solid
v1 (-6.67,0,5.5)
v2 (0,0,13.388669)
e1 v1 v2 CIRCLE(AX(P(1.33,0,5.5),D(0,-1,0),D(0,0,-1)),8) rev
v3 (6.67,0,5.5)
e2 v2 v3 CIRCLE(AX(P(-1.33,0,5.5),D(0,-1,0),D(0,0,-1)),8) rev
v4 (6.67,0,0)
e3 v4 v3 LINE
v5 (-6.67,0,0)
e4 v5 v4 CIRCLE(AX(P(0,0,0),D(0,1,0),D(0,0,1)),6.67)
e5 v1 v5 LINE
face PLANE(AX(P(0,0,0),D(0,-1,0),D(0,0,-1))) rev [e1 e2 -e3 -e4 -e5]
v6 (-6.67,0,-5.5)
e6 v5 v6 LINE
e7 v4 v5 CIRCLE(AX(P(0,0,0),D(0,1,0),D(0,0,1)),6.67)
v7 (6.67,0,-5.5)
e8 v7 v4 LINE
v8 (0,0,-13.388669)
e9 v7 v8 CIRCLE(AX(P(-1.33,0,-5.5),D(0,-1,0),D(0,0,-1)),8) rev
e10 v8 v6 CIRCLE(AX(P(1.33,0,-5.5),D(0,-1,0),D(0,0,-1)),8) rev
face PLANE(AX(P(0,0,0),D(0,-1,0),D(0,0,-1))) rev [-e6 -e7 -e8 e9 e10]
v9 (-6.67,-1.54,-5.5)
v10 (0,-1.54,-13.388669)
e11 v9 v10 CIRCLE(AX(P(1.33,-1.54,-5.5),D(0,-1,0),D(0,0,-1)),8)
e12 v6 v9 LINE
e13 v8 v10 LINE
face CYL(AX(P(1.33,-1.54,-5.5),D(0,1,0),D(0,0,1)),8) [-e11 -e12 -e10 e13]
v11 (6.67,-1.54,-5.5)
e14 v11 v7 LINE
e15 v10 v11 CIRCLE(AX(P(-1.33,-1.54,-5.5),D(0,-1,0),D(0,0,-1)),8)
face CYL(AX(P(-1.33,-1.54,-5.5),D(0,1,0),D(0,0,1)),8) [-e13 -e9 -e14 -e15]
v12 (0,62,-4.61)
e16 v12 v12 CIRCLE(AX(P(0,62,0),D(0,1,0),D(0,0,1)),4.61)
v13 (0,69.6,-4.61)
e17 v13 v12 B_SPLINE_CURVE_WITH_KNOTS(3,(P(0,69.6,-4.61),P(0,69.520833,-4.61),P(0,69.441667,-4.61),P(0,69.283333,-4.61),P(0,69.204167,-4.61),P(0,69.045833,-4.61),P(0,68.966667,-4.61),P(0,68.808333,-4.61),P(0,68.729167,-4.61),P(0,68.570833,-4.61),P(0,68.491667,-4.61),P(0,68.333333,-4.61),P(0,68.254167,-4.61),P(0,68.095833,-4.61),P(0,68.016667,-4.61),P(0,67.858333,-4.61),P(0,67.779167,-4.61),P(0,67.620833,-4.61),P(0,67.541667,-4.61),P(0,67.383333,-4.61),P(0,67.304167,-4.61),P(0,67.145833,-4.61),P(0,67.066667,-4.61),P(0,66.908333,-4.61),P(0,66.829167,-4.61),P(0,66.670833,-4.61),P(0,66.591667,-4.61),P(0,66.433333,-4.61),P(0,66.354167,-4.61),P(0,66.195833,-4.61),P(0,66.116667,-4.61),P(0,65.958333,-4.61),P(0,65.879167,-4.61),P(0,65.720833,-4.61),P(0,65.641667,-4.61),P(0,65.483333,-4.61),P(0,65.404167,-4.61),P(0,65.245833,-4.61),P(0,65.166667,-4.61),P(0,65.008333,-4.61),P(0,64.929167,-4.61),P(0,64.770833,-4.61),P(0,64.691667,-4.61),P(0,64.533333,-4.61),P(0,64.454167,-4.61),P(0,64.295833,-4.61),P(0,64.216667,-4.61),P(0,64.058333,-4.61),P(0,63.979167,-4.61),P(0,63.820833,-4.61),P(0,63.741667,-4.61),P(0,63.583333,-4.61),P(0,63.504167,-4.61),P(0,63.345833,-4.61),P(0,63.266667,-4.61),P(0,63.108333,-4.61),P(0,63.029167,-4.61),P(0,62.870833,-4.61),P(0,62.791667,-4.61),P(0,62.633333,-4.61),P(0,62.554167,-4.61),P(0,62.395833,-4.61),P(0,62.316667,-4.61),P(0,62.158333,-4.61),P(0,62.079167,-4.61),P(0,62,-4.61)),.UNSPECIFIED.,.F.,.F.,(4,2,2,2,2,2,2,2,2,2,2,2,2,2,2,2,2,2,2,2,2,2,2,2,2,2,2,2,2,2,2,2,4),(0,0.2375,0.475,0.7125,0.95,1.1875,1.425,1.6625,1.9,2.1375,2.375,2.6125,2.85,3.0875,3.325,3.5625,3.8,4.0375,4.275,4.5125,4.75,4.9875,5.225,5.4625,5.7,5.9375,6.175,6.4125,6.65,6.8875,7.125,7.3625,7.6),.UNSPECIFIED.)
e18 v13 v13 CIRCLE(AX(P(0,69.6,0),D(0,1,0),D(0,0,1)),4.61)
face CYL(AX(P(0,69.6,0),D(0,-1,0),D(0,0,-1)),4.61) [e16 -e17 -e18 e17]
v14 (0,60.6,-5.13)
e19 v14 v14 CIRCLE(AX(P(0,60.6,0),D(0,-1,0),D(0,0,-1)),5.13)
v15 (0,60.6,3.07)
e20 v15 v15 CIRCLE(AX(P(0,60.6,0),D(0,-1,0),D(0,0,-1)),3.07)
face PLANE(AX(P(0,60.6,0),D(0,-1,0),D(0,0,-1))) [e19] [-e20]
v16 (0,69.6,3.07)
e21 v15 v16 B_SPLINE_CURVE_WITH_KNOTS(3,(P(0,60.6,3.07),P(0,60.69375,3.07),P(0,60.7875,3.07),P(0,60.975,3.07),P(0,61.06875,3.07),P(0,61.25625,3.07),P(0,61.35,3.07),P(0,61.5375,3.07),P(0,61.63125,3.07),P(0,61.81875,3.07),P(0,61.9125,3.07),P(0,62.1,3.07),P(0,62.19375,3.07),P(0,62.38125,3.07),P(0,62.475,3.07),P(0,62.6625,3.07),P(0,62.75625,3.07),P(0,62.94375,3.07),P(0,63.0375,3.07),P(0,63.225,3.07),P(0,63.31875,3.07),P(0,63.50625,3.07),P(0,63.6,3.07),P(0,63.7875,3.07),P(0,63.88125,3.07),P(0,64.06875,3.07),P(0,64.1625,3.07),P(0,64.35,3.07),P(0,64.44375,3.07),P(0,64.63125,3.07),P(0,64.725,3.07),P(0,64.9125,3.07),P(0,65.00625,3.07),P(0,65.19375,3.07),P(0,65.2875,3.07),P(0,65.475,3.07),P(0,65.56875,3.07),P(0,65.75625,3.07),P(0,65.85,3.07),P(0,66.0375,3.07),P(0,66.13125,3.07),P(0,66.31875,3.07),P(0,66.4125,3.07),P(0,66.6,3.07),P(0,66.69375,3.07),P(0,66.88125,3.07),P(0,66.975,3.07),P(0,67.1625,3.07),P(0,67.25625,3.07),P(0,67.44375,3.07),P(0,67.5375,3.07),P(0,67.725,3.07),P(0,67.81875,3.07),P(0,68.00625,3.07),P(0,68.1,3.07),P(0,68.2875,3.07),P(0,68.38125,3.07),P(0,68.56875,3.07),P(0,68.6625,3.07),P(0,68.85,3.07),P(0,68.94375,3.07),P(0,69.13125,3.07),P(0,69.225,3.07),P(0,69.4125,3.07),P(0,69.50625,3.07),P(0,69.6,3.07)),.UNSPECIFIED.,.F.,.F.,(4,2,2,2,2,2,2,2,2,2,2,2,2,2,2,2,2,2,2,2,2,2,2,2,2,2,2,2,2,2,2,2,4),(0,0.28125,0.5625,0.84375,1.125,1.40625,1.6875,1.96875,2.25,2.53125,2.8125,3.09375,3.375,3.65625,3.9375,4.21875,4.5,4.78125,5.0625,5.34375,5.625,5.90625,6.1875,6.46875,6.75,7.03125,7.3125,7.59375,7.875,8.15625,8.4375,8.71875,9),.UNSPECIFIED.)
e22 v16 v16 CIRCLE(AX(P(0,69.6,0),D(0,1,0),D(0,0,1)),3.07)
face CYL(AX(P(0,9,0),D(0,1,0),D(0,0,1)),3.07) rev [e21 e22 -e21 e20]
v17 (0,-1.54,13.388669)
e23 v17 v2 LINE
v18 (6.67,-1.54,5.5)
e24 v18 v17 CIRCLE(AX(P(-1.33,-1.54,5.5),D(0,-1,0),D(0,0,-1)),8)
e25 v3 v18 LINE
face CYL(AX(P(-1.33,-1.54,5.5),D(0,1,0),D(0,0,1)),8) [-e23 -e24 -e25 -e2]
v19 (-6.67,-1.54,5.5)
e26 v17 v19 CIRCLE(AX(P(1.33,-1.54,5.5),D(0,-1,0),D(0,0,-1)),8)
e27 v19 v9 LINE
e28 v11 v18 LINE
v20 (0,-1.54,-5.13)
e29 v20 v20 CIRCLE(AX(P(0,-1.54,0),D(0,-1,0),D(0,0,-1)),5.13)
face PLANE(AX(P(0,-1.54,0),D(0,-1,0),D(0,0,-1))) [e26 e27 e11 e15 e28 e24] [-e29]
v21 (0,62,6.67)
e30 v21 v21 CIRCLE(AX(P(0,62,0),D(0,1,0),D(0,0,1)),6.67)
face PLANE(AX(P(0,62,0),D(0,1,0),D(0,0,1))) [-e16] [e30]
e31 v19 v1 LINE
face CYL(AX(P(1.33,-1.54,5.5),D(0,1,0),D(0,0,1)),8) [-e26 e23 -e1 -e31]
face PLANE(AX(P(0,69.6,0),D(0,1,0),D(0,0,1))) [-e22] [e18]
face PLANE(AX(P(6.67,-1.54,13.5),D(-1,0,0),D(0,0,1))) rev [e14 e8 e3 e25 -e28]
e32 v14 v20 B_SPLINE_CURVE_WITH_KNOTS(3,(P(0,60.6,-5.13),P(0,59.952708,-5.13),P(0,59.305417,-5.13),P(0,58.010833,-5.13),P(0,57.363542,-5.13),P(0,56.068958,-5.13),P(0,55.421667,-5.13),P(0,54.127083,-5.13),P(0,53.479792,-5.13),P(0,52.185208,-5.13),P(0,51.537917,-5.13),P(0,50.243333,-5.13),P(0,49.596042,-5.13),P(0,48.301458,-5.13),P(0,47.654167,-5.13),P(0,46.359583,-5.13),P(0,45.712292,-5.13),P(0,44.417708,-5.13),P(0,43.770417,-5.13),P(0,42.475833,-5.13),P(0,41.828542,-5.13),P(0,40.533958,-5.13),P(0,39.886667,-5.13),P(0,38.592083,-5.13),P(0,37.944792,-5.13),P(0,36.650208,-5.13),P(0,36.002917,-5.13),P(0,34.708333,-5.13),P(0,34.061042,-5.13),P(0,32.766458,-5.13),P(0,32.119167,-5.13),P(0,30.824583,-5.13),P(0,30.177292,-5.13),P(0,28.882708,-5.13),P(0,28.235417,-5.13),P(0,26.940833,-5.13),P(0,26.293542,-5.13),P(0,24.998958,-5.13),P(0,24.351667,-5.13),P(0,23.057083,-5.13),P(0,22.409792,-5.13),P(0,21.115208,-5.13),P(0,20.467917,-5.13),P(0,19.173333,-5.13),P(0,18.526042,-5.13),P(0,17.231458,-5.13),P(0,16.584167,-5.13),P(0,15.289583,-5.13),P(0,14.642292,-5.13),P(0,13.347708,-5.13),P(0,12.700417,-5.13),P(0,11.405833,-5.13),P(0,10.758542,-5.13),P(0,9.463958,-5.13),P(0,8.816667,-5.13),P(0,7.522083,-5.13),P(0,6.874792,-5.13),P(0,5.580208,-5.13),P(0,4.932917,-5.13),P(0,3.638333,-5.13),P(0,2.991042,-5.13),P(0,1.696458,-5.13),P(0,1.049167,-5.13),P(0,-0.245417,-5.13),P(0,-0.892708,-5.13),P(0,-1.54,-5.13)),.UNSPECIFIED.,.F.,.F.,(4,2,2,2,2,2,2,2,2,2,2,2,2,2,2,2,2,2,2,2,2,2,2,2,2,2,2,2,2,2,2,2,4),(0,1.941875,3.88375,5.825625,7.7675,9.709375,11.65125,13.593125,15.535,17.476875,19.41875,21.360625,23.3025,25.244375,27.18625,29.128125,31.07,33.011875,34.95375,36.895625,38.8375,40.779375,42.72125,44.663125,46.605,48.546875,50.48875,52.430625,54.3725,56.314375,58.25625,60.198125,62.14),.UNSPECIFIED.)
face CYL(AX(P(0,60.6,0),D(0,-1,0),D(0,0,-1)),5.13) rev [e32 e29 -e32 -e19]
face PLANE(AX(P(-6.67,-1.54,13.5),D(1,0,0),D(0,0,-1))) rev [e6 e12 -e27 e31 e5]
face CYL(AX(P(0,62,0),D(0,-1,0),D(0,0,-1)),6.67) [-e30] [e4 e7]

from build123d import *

# Parameters (mm, degrees)
CROQUIS1_R              = 6.67
SALIENTE_EXTRUIR1_DEPTH = 62
CROQUIS2_R              = 4.61
SALIENTE_EXTRUIR2_DEPTH = 7.6
CROQUIS3_R              = 5.13
CORTAR_EXTRUIR1_DEPTH   = 60.6
CROQUIS4_R              = 3.07
CORTAR_EXTRUIR2_DEPTH   = 60.6
SALIENTE_EXTRUIR3_START = 1.54
CROQUIS5_W              = 13.34
CROQUIS5_H              = 27
CROQUIS5_R              = 5.13
SALIENTE_EXTRUIR3_DEPTH = 1.54
REDONDEO1_R             = 8


with BuildPart() as part:
    # Croquis1 → Saliente-Extruir1 (new body)
    with BuildSketch(Plane(origin=(0, 0, 0), x_dir=(1, 0, 0), z_dir=(0, 1, 0))):
        with Locations(Location((0, 0, 0), (0, 0, 270))):
            Circle(CROQUIS1_R)
    extrude(amount=SALIENTE_EXTRUIR1_DEPTH)

    # Croquis2 → Saliente-Extruir2 (add)
    with BuildSketch(Plane(origin=(0, 62, 0), x_dir=(1, 0, 0), z_dir=(0, 1, 0))):
        with Locations(Location((0, 0, 0), (0, 0, 90))):
            Circle(CROQUIS2_R)
    extrude(amount=SALIENTE_EXTRUIR2_DEPTH)

    # Croquis3 → Cortar-Extruir1 (cut)
    with BuildSketch(Plane.XZ):
        with Locations(Location((0, 0, 0), (0, 0, 270))):
            Circle(CROQUIS3_R)
    extrude(amount=-CORTAR_EXTRUIR1_DEPTH, mode=Mode.SUBTRACT)

    # Croquis4 → Cortar-Extruir2 (cut)
    with BuildSketch(Plane(origin=(0, 69.6, 0), x_dir=(1, 0, 0), z_dir=(0, 1, 0))):
        with Locations(Location((0, 0, 0), (0, 0, 270))):
            Circle(CROQUIS4_R)
    extrude(amount=-CORTAR_EXTRUIR2_DEPTH, mode=Mode.SUBTRACT)

    # Croquis5 → Saliente-Extruir3 (add)
    with BuildSketch(Plane.XZ.offset(SALIENTE_EXTRUIR3_START)):
        Rectangle(CROQUIS5_W, CROQUIS5_H)
        with Locations(Location((0, 0, 0), (0, 0, 270))):
            Circle(CROQUIS5_R, mode=Mode.SUBTRACT)
    extrude(amount=-SALIENTE_EXTRUIR3_DEPTH)

    # Redondeo1
    # the kernel refuses this fillet: 8 mm, written as the material it takes off along each edge
    with BuildSketch(Plane(origin=(-6.67, -21.54, -13.5), x_dir=(0, 0, 1), z_dir=(0, 1, 0)), Plane(origin=(6.67, -21.54, -13.5), x_dir=(-1, 0, 0), z_dir=(0, 1, 0)), Plane(origin=(6.67, -21.54, 13.5), x_dir=(0, 0, -1), z_dir=(0, 1, 0))) as redondeo1_piece_1:
        with BuildLine():
            CenterArc((REDONDEO1_R, REDONDEO1_R), REDONDEO1_R, 180, 90)
            Line((0, REDONDEO1_R), (0, 0))
            Line((0, 0), (REDONDEO1_R, 0))
        make_face()
    extrude(amount=41.54, mode=Mode.SUBTRACT)
    with BuildSketch(Plane(origin=(-6.67, -21.54, 13.5), x_dir=(0, 0, -1), z_dir=(0, 1, 0))) as redondeo1_piece_2:
        with BuildLine():
            CenterArc((REDONDEO1_R, -REDONDEO1_R), REDONDEO1_R, 90, 90)
            Line((0, -REDONDEO1_R), (0, 0))
            Line((0, 0), (REDONDEO1_R, 0))
        make_face()
    extrude(amount=41.54, mode=Mode.SUBTRACT)


solid = part.part
